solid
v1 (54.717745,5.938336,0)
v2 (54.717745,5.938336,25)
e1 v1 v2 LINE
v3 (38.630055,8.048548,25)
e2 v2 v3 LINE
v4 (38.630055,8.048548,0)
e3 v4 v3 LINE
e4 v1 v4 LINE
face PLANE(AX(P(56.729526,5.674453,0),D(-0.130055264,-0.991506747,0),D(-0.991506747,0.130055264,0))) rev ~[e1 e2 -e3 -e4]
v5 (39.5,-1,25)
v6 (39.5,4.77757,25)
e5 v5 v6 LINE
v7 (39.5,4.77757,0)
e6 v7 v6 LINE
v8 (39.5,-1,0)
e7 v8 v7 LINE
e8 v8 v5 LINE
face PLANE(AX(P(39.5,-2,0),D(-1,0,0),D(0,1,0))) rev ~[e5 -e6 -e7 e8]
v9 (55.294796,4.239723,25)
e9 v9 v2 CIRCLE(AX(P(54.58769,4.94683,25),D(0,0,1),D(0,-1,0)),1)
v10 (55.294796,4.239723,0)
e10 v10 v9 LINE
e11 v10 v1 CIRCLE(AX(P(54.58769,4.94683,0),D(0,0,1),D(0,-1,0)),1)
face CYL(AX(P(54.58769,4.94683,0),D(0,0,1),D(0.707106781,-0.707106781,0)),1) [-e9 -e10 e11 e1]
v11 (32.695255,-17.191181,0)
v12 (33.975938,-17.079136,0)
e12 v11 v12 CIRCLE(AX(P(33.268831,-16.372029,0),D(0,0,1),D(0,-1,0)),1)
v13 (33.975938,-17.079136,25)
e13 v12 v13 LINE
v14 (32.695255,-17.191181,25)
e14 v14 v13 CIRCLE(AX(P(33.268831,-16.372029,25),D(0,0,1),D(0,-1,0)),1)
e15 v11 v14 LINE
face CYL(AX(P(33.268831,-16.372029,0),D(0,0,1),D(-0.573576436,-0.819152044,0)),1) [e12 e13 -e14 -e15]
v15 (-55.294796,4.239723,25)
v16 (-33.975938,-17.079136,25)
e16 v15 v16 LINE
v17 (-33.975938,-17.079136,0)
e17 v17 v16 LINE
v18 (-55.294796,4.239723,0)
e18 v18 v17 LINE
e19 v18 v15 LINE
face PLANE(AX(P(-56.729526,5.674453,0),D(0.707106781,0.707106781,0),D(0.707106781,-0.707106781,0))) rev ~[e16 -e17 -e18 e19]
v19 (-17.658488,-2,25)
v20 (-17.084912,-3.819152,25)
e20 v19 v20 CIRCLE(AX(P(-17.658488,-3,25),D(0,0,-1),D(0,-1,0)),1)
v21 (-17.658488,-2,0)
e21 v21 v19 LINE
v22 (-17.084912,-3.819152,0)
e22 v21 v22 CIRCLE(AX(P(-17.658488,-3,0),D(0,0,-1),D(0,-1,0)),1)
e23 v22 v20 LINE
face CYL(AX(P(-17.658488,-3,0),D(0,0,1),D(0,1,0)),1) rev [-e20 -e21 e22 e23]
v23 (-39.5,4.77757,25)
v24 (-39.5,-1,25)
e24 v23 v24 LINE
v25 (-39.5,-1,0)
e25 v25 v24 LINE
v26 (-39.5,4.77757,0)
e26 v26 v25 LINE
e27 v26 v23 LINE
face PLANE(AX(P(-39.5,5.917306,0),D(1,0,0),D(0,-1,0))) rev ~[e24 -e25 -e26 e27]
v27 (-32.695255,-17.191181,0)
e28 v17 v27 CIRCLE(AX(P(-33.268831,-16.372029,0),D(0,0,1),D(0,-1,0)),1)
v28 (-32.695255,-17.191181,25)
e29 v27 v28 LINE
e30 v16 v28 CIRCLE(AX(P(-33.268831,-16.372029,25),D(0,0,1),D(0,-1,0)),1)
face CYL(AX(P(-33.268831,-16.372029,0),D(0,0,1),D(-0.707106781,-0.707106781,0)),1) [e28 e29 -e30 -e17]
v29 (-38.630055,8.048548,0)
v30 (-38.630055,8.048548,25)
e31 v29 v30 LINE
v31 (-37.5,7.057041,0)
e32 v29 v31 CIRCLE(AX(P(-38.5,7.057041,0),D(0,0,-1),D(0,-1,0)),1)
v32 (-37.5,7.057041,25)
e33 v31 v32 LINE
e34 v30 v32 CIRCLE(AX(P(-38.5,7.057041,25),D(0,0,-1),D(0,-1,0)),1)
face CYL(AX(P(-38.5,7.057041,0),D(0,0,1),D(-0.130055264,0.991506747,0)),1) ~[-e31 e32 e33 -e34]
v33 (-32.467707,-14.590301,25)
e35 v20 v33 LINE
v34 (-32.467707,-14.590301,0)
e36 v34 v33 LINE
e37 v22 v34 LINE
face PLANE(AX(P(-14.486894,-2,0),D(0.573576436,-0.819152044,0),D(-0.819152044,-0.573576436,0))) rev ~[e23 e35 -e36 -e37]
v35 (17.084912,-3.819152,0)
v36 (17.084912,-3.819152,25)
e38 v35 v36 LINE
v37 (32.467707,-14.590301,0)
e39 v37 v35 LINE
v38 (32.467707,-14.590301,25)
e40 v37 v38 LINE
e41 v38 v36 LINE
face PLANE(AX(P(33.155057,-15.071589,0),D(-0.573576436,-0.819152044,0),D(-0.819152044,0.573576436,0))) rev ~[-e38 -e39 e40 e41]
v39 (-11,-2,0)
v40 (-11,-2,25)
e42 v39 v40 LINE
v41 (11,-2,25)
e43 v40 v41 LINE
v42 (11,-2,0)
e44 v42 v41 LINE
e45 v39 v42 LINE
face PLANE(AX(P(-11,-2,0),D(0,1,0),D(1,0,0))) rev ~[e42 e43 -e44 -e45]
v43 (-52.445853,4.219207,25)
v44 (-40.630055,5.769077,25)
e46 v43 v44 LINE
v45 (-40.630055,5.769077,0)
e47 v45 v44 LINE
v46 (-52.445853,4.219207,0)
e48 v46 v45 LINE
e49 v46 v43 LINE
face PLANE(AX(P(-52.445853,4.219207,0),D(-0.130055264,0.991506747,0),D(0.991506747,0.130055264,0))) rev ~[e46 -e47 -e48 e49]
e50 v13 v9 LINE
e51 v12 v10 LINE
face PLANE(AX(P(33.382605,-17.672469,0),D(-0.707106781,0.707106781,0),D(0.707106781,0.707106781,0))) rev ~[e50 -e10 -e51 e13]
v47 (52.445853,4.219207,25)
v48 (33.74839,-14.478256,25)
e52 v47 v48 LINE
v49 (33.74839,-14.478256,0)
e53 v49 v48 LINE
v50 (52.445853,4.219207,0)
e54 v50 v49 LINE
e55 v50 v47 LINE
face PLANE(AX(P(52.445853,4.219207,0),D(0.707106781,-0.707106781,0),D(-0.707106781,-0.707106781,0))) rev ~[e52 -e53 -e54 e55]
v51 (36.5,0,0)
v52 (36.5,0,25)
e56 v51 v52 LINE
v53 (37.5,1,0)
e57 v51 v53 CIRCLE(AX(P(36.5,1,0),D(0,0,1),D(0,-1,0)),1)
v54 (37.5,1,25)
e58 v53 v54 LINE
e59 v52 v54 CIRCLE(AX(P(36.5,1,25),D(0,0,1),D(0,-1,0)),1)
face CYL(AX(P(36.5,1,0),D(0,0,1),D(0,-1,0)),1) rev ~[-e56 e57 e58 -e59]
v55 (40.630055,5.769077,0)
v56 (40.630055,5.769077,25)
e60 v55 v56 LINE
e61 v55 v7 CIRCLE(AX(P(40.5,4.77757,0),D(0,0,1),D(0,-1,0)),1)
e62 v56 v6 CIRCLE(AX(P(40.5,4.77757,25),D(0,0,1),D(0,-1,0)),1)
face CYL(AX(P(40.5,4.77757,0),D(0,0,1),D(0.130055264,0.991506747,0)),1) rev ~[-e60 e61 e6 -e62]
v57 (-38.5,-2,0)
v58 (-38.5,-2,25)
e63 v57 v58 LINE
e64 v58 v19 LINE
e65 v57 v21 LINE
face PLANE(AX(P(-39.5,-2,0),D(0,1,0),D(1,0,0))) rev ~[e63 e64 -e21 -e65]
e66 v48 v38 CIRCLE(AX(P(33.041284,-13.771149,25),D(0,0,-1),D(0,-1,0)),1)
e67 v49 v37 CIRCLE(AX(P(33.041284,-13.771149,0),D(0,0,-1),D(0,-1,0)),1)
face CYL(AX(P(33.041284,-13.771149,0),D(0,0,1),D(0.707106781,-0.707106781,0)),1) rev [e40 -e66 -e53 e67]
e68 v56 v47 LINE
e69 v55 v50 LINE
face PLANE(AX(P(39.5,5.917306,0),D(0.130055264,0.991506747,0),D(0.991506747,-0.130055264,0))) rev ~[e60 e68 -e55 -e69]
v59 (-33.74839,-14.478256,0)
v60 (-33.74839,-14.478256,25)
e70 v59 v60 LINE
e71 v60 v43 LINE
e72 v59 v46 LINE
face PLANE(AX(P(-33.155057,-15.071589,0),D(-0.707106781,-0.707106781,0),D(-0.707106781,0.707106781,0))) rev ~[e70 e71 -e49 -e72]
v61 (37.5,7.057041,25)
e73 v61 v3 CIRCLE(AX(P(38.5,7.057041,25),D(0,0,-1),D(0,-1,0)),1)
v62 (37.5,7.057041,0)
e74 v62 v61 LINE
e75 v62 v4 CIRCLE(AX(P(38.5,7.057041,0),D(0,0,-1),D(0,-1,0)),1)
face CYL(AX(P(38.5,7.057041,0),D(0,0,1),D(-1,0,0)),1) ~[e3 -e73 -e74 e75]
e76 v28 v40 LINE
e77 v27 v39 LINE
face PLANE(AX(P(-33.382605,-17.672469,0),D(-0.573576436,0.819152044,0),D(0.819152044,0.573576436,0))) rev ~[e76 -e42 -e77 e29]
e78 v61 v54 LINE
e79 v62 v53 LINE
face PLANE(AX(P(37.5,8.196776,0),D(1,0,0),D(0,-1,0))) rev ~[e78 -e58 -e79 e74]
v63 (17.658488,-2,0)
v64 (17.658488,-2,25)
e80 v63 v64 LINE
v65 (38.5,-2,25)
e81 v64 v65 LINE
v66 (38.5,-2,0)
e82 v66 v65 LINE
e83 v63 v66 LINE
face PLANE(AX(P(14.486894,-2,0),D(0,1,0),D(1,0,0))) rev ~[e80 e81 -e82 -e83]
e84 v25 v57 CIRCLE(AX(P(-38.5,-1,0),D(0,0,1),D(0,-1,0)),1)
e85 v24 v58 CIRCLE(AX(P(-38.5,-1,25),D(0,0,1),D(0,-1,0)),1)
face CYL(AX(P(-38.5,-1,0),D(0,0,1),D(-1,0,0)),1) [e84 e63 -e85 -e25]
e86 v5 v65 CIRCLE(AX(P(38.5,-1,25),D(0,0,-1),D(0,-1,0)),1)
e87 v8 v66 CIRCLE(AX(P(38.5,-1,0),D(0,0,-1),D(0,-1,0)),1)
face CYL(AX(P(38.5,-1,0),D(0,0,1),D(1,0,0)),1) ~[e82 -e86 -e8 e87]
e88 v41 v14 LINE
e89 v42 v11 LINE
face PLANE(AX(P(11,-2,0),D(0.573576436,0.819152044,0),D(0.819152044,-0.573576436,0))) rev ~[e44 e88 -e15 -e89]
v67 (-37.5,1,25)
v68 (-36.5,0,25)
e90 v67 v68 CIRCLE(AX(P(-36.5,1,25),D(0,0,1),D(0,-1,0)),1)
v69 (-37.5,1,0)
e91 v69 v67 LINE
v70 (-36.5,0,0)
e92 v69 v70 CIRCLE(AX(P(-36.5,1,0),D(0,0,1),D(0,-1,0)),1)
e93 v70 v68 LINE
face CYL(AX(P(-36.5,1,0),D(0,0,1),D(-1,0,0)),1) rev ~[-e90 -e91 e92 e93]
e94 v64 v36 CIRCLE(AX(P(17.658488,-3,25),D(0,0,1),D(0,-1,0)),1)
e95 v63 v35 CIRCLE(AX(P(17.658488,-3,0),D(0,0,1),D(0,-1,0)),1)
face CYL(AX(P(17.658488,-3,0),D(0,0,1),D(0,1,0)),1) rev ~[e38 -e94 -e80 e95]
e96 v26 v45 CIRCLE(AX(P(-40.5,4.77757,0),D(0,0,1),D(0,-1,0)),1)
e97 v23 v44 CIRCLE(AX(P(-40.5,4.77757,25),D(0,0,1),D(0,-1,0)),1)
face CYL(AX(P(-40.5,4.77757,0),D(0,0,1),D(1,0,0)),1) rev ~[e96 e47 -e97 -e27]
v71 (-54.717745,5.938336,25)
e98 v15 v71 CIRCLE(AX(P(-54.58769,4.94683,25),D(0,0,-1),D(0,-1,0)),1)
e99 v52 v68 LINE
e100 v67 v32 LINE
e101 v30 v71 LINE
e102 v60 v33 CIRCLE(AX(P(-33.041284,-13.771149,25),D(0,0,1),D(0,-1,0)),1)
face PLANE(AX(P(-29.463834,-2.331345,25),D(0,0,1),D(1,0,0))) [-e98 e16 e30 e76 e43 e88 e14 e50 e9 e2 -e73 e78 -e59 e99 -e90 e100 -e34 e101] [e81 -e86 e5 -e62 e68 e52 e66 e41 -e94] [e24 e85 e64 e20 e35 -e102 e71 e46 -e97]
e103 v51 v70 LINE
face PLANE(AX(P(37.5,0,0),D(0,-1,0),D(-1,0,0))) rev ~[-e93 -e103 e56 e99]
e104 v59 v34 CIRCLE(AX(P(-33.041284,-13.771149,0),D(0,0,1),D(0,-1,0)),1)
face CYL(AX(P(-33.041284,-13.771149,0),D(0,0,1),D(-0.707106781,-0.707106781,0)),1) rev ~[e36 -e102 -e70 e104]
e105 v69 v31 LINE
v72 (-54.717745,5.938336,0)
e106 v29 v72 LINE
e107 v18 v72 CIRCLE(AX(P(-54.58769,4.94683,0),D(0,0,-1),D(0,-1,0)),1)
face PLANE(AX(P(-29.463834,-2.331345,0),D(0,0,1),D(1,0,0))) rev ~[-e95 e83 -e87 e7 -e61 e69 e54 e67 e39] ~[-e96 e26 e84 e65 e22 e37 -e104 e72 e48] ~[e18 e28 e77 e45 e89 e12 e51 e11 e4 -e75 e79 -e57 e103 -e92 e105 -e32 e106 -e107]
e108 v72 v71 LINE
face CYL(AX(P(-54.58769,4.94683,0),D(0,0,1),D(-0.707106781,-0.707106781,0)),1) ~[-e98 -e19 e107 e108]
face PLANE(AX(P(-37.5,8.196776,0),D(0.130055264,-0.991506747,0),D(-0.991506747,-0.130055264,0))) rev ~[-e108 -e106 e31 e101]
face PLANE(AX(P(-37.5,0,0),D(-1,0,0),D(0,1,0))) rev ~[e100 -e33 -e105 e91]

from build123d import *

# Parameters (mm, degrees)
F1_DEPTH = 25
F2_R     = 1


# Not quite as in the source:
# - a feature names something its author has since deleted; it is built from what else it names


with BuildPart() as f1:
    # F0 (on Top) → F1 (new body)
    with BuildSketch(Plane.XY):
        Polygon((0, -2), (0, 0), (-37.5, 0), (-37.5, 8.1967763358), (-56.72952592, 5.6744525365), (-33.382604787, -17.6724685966), (-11, -2), align=None)
        Polygon((-39.5, -2), (-14.4868935912, -2), (-33.1550573032, -15.0715889556), (-52.4458532095, 4.2192069507), (-39.5, 5.9173056865), align=None, mode=Mode.SUBTRACT)
        Polygon((37.5, 0), (0, 0), (0, -2), (11, -2), (33.382604787, -17.6724685966), (56.72952592, 5.6744525365), (37.5, 8.1967763358), align=None)
        Polygon((33.1550573032, -15.0715889556), (14.4868935912, -2), (39.5, -2), (39.5, 5.9173056865), (52.4458532095, 4.2192069507), align=None, mode=Mode.SUBTRACT)
    extrude(amount=F1_DEPTH)

    # F2
    f2_edges = [f1.edges().sort_by_distance(p)[0] for p in [
        (-37.5, 8.196776, 12.5),
        (-56.729526, 5.674453, 12.5),
        (-33.382605, -17.672469, 12.5),
        (-37.5, 0, 12.5),
        (-39.5, -2, 12.5),
        (37.5, 0, 12.5),
        (37.5, 8.196776, 12.5),
        (56.729526, 5.674453, 12.5),
        (39.5, -2, 12.5),
        (33.382605, -17.672469, 12.5),
        (14.486894, -2, 12.5),
        (-14.486894, -2, 12.5),
        (-39.5, 5.917306, 12.5),
        (-33.155057, -15.071589, 12.5),
        (39.5, 5.917306, 12.5),
        (33.155057, -15.071589, 12.5),
    ]]
    fillet(f2_edges, radius=F2_R)


solid = f1.part
